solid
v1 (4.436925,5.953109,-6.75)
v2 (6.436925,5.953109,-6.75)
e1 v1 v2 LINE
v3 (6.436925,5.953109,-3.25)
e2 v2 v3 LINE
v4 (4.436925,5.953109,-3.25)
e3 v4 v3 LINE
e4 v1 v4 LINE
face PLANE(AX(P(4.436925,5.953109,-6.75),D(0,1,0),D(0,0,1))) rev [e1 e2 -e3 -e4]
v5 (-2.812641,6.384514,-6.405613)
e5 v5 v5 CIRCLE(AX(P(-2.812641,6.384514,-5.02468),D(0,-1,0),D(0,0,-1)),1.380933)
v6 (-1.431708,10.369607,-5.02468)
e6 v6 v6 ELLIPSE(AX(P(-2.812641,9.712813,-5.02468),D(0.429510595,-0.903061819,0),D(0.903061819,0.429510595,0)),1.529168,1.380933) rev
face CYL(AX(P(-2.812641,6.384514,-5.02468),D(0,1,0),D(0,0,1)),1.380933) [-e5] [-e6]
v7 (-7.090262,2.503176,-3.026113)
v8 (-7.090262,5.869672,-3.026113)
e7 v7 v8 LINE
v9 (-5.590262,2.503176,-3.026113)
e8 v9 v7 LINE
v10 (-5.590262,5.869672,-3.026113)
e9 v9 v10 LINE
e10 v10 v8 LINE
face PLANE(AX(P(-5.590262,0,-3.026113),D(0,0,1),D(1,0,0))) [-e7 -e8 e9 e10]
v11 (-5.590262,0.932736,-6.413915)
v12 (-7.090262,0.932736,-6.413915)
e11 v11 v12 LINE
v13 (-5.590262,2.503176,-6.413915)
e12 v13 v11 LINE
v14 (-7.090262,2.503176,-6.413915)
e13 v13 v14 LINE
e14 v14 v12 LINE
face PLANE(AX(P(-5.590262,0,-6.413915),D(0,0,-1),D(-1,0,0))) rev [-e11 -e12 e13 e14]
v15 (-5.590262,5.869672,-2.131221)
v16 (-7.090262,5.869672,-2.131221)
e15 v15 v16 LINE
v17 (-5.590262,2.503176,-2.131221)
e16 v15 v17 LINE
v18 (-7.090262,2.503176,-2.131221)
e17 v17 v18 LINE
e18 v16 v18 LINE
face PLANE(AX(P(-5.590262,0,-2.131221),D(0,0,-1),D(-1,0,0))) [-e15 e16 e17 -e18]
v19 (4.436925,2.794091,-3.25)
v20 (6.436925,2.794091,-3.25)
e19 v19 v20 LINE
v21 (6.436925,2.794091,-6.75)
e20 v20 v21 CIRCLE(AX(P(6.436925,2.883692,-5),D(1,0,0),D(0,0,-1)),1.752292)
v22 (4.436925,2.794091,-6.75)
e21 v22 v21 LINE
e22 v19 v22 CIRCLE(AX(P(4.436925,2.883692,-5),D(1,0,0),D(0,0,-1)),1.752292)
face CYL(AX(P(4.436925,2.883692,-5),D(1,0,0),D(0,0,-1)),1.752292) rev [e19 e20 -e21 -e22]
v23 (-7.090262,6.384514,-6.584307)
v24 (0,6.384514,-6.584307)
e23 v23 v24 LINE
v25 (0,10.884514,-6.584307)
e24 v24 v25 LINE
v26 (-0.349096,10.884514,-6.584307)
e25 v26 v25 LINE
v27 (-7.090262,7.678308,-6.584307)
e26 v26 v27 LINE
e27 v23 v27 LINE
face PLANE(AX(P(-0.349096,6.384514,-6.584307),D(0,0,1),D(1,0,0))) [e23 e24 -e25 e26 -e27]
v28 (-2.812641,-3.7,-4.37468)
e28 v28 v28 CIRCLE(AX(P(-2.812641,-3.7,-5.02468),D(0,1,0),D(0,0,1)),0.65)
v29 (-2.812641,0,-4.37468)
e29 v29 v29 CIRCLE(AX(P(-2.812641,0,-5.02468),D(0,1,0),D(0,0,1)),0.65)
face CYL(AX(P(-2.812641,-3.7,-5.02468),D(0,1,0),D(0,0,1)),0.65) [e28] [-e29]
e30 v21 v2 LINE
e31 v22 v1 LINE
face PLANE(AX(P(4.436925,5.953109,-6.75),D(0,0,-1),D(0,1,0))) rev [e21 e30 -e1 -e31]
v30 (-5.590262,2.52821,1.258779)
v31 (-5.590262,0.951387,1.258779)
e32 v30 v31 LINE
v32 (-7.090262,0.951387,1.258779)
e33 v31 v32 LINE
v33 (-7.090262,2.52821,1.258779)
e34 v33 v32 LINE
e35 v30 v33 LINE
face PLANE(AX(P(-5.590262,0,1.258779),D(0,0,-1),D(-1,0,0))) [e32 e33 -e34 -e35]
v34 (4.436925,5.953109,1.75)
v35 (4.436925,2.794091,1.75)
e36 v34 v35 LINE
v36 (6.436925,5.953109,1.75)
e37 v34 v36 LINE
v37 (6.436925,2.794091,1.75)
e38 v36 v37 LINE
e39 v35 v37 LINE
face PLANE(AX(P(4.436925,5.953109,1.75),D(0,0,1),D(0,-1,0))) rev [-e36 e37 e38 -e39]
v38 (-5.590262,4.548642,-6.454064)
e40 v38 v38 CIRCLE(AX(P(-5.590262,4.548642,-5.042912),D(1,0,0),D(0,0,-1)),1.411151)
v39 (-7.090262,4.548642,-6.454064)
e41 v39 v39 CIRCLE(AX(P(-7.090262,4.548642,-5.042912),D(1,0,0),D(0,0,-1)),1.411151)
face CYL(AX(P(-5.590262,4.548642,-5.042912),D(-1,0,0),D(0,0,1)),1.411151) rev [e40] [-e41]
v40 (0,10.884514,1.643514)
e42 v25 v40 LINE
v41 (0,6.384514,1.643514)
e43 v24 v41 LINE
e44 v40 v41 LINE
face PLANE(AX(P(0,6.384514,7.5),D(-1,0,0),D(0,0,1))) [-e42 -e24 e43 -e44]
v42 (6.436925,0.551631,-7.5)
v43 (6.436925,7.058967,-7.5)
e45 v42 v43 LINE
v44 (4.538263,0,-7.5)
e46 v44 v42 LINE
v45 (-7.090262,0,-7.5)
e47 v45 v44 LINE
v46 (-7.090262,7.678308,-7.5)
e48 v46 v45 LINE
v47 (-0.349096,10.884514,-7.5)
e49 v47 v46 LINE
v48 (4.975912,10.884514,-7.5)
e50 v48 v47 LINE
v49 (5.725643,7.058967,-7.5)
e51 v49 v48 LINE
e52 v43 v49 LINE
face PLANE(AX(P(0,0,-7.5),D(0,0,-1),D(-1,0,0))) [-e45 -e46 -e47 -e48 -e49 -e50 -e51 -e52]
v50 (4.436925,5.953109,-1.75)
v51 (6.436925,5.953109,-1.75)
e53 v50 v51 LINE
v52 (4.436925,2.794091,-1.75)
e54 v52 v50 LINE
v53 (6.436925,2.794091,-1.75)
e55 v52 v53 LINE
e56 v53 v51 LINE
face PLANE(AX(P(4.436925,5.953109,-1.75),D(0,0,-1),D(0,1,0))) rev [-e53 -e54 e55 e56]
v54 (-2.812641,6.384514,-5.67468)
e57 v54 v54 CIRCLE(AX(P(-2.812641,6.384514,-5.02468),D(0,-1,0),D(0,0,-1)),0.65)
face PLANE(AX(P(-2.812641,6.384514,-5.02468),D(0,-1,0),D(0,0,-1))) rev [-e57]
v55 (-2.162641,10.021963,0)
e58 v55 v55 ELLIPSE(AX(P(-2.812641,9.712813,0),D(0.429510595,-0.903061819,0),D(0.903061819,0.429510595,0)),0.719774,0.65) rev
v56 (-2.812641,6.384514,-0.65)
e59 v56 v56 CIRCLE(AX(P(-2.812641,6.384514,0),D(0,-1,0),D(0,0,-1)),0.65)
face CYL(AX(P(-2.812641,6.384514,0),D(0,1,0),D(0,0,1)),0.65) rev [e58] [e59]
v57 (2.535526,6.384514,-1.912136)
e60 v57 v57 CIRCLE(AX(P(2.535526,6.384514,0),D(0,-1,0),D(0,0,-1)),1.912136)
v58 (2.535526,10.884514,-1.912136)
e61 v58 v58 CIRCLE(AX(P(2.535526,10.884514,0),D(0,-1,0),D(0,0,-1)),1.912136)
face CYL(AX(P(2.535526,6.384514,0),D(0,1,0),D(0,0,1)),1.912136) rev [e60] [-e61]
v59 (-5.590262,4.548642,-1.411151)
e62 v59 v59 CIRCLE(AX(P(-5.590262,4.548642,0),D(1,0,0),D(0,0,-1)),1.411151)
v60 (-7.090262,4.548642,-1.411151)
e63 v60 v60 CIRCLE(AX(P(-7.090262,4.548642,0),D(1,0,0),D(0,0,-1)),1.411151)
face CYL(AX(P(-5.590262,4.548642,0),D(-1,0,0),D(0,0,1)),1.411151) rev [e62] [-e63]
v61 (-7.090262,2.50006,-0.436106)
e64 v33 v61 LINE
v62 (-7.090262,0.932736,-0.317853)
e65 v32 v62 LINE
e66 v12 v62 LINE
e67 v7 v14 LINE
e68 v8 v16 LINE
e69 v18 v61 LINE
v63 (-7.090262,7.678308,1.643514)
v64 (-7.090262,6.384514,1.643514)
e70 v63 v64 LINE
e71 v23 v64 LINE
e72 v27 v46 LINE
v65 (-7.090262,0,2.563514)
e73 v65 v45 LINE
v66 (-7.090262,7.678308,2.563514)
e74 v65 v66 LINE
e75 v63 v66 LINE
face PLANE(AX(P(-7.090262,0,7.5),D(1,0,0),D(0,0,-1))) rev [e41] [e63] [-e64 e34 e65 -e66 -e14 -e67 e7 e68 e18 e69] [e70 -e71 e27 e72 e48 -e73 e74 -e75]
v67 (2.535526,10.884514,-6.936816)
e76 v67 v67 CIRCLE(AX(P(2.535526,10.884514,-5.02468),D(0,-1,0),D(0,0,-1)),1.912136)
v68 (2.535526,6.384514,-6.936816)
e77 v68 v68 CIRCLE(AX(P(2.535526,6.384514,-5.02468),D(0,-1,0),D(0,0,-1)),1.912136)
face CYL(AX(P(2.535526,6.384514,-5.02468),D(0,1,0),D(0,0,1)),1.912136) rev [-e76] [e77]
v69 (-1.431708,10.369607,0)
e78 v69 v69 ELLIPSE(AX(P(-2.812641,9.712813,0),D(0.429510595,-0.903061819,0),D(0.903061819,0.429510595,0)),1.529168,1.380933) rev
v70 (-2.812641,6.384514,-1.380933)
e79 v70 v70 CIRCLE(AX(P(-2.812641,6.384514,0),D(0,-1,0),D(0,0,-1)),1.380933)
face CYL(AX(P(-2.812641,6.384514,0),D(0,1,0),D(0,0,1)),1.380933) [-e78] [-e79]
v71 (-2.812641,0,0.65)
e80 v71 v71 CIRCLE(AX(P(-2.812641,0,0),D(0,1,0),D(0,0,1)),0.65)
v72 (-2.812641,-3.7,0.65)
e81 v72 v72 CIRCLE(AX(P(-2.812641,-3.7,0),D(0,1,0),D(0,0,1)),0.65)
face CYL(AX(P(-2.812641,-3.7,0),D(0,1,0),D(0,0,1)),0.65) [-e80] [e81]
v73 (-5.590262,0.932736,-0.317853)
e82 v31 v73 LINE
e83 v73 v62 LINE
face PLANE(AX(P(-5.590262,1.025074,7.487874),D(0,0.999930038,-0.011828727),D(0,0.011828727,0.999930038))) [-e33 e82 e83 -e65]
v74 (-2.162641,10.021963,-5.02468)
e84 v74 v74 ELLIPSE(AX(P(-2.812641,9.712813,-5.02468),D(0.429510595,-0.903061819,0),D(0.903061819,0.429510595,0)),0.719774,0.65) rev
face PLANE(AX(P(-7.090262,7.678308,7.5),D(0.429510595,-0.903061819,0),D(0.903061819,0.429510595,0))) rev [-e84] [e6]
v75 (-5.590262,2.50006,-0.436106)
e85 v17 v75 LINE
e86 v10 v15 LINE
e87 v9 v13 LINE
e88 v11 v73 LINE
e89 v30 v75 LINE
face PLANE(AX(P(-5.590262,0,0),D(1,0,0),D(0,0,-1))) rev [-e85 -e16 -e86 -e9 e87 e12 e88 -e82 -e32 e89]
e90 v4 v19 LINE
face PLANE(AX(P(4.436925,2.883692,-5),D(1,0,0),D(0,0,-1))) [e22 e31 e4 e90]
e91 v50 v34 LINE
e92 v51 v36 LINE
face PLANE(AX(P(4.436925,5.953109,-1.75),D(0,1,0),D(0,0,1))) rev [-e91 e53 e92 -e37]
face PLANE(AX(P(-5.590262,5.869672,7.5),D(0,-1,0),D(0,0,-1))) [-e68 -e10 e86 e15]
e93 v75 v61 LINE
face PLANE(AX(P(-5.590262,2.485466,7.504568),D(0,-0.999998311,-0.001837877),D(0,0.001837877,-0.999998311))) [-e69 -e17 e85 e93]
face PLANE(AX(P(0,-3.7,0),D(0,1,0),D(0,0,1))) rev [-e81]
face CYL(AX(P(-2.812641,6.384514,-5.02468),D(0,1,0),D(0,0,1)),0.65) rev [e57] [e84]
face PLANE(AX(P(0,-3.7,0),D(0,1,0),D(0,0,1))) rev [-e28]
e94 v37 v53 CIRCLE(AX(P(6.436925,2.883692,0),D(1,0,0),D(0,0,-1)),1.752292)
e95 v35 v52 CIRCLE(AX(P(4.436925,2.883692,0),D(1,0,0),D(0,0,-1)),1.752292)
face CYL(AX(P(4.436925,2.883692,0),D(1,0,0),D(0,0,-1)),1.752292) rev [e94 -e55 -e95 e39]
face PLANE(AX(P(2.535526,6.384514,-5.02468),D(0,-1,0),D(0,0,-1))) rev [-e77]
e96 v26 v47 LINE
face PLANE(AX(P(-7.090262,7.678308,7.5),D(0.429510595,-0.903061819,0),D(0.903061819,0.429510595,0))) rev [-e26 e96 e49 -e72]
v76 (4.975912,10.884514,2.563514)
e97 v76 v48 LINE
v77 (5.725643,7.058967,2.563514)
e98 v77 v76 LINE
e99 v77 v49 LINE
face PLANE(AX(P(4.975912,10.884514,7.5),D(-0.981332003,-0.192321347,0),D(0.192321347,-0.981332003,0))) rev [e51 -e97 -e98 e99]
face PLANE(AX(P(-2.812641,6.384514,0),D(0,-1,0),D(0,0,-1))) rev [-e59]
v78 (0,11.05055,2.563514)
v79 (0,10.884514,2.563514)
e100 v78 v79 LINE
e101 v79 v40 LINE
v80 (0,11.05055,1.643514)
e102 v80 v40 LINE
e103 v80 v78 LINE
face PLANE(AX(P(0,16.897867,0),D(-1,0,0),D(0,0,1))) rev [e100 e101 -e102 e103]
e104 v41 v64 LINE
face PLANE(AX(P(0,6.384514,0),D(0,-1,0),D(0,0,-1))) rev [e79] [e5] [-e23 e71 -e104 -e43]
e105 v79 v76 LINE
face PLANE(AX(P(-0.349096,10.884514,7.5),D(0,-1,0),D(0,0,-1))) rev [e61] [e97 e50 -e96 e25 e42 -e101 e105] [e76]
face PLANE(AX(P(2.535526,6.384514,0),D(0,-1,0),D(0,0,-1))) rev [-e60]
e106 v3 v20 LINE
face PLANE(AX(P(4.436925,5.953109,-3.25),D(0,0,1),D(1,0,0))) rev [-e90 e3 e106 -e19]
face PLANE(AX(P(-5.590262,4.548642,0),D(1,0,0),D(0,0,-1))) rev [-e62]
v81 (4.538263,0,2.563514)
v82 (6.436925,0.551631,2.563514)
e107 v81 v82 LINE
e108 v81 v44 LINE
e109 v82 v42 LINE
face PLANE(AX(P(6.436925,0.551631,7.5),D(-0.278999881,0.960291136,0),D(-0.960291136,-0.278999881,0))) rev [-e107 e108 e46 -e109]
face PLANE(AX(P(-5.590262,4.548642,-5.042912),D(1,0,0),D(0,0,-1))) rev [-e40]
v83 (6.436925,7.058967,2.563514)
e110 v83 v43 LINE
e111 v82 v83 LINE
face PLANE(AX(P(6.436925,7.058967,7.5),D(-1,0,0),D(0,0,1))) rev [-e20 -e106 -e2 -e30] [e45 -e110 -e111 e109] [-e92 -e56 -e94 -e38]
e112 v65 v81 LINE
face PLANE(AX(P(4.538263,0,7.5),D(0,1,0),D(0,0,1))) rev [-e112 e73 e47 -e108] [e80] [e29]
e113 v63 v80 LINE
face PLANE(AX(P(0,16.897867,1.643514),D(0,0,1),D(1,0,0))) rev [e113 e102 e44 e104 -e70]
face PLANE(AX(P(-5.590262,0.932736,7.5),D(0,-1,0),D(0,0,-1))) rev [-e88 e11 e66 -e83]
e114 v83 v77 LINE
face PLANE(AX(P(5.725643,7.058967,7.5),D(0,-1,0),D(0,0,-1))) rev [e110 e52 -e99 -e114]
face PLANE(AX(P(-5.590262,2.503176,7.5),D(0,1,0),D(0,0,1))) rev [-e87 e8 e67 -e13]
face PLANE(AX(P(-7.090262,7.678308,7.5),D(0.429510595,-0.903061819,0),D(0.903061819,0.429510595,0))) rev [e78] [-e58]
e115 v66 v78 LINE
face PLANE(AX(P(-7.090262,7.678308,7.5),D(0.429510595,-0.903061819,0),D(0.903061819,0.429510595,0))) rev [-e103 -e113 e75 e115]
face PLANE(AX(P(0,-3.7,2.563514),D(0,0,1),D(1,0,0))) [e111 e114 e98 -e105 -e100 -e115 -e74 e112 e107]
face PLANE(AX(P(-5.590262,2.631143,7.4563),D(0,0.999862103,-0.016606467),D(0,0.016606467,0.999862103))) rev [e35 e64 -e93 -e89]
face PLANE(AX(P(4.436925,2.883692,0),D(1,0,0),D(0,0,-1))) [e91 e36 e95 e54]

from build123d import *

# Parameters (mm, degrees)
EXTRUDE_1_DEPTH     = 7.5
CUT_EXTRUDE_START   = 10.884514
SKETCH_2_R          = 1.912136214
SKETCH_2_W          = 7.090261775
SKETCH_2_H          = 13.093091483
SKETCH_2_R_2        = 1.380933403
SKETCH_2_R_3        = 0.65
CUT_EXTRUDE_1_DEPTH = 4.5
CUT_EXTRUDE_2_DEPTH = 2
SKETCH_2_6_R        = 0.65
EXTRUDE_3_DEPTH     = 3.7
CUT_EXTRUDE_START_2 = -7.090262
SKETCH_4_R          = 1.411151221
SKETCH_4_R_2        = 0.775543873
CUT_EXTRUDE_3_DEPTH = 1.5
SKETCH_5_W          = 1.46101298
SKETCH_5_H          = 4.936486251
SKETCH_5_R          = 1.912136214
CUT_EXTRUDE_4_DEPTH = 18.867005063
EXTRUDE_START       = 1.643513749
EXTRUDE_4_DEPTH     = 0.92


# Read off the part's stored shape, not the designer's step: Бобышка-Вытянуть4
with BuildPart() as part:
    # Эскиз1 → Бобышка-Вытянуть1 (new, symmetric)
    with BuildSketch(Plane.XY):
        Polygon((-7.090261775, 0), (-7.090261775, 7.678308116), (-0.349095572, 10.884514209), (4.975912264, 10.884514209), (5.725642609, 7.058967063), (6.436925244, 7.058967063), (6.436925244, 0.551631224), (4.538262875, 0), align=None)
    extrude(amount=EXTRUDE_1_DEPTH, both=True)

    # Эскиз2 → Вырез-Вытянуть1 (cut)
    # profile 1 of 7: a face of its own
    with BuildSketch(Plane(origin=(0, 0, 0), x_dir=(1, 0, 0), z_dir=(0, 1, 0)).offset(CUT_EXTRUDE_START)):
        with Locations(Location((2.535525991, 5.024679523, 0), (0, 0, 90))):
            Circle(SKETCH_2_R)
    # profile 2 of 7: a face of its own
    with BuildSketch(Plane(origin=(0, 0, 0), x_dir=(1, 0, 0), z_dir=(0, 1, 0)).offset(CUT_EXTRUDE_START)):
        with Locations(Location((2.535525991, 0, 0), (0, 0, 90))):
            Circle(SKETCH_2_R)
    # profile 3 of 7: a face of its own
    with BuildSketch(Plane(origin=(0, 0, 0), x_dir=(1, 0, 0), z_dir=(0, 1, 0)).offset(CUT_EXTRUDE_START)):
        with Locations(Location((2.535525991, -5.063513749, 0), (0, 0, 90))):
            Circle(SKETCH_2_R)
    # profile 4 of 7: a face of its own
    with BuildSketch(Plane(origin=(0, 0, 0), x_dir=(1, 0, 0), z_dir=(0, 1, 0)).offset(CUT_EXTRUDE_START)):
        with Locations((-3.545130888, 0.03776166)):
            Rectangle(SKETCH_2_W, SKETCH_2_H)
        with Locations((-2.812641214, -5.063513749)):
            Circle(SKETCH_2_R_2, mode=Mode.SUBTRACT)
        with Locations((-2.812641214, 0)):
            Circle(SKETCH_2_R_2, mode=Mode.SUBTRACT)
        with Locations((-2.812641214, 5.024679523)):
            Circle(SKETCH_2_R_2, mode=Mode.SUBTRACT)
    # profile 5 of 7: a face of its own
    with BuildSketch(Plane(origin=(0, 0, 0), x_dir=(1, 0, 0), z_dir=(0, 1, 0)).offset(CUT_EXTRUDE_START)):
        with Locations((-2.812641214, -5.063513749)):
            Circle(SKETCH_2_R_3)
    # profile 6 of 7: a face of its own
    with BuildSketch(Plane(origin=(0, 0, 0), x_dir=(1, 0, 0), z_dir=(0, 1, 0)).offset(CUT_EXTRUDE_START)):
        with Locations((-2.812641214, 0)):
            Circle(SKETCH_2_R_3)
    # profile 7 of 7: a face of its own
    with BuildSketch(Plane(origin=(0, 0, 0), x_dir=(1, 0, 0), z_dir=(0, 1, 0)).offset(CUT_EXTRUDE_START)):
        with Locations((-2.812641214, 5.024679523)):
            Circle(SKETCH_2_R_3)
    extrude(amount=-CUT_EXTRUDE_1_DEPTH, mode=Mode.SUBTRACT)

    # Эскиз3 → Вырез-Вытянуть2 (cut)
    with BuildSketch(Plane(origin=(6.436925244, 0, 0), x_dir=(0, 0, -1), z_dir=(1, 0, 0))):
        with BuildLine():
            Line((1.75, 5.953109404), (-1.75, 5.953109404))
            Line((-1.75, 5.953109404), (-1.75, 2.794090542))
            ThreePointArc((-1.75, 2.794090542), (0, 1.131399682), (1.75, 2.794090542))
            Line((1.75, 2.794090542), (1.75, 5.953109404))
        make_face()
        with BuildLine():
            Line((3.25, 5.953109404), (3.25, 2.794090542))
            ThreePointArc((3.25, 2.794090542), (5, 1.131399682), (6.75, 2.794090542))
            Line((6.75, 2.794090542), (6.75, 5.953109404))
            Line((6.75, 5.953109404), (3.25, 5.953109404))
        make_face()
        with BuildLine():
            Line((-6.75, 5.953109404), (-6.75, 2.794090542))
            ThreePointArc((-6.75, 2.794090542), (-5, 1.131399682), (-3.25, 2.794090542))
            Line((-3.25, 2.794090542), (-3.25, 5.953109404))
            Line((-3.25, 5.953109404), (-6.75, 5.953109404))
        make_face()
    extrude(amount=-CUT_EXTRUDE_2_DEPTH, mode=Mode.SUBTRACT)

    # Эскиз2<6> → Бобышка-Вытянуть3 (add)
    with BuildSketch(Plane(origin=(0, 0, 0), x_dir=(1, 0, 0), z_dir=(0, 1, 0))):
        with Locations((-2.812641214, 5.024679523)):
            Circle(SKETCH_2_6_R)
        with Locations((-2.812641214, 0)):
            Circle(SKETCH_2_6_R)
        with Locations((-2.812641214, -5.063513749)):
            Circle(SKETCH_2_6_R)
    extrude(amount=-EXTRUDE_3_DEPTH)

    # Эскиз4 → Вырез-Вытянуть3 (cut)
    # profile 1 of 7: a face of its own
    with BuildSketch(Plane(origin=(0, 0, 0), x_dir=(0, 0, -1), z_dir=(1, 0, 0)).offset(CUT_EXTRUDE_START_2)):
        with Locations((5.042912497, 4.548641576)):
            Circle(SKETCH_4_R)
        with Locations((5.042912497, 4.548641576)):
            Circle(SKETCH_4_R_2, mode=Mode.SUBTRACT)
    # profile 2 of 7: a face of its own
    with BuildSketch(Plane(origin=(0, 0, 0), x_dir=(0, 0, -1), z_dir=(1, 0, 0)).offset(CUT_EXTRUDE_START_2)):
        with Locations((5.042912497, 4.548641576)):
            Circle(SKETCH_4_R_2)
    # profile 3 of 7: a face of its own
    with BuildSketch(Plane(origin=(0, 0, 0), x_dir=(0, 0, -1), z_dir=(1, 0, 0)).offset(CUT_EXTRUDE_START_2)):
        with Locations((0, 4.548641576)):
            Circle(SKETCH_4_R)
        with Locations((0, 4.548641576)):
            Circle(SKETCH_4_R_2, mode=Mode.SUBTRACT)
    # profile 4 of 7: a face of its own
    with BuildSketch(Plane(origin=(0, 0, 0), x_dir=(0, 0, -1), z_dir=(1, 0, 0)).offset(CUT_EXTRUDE_START_2)):
        with Locations((0, 4.548641576)):
            Circle(SKETCH_4_R_2)
    # profile 5 of 7: a face of its own
    with BuildSketch(Plane(origin=(0, 0, 0), x_dir=(0, 0, -1), z_dir=(1, 0, 0)).offset(CUT_EXTRUDE_START_2)):
        with Locations((-5.053327676, 4.548641576)):
            Circle(SKETCH_4_R)
        with Locations((-5.053327676, 4.548641576)):
            Circle(SKETCH_4_R_2, mode=Mode.SUBTRACT)
    # profile 6 of 7: a face of its own
    with BuildSketch(Plane(origin=(0, 0, 0), x_dir=(0, 0, -1), z_dir=(1, 0, 0)).offset(CUT_EXTRUDE_START_2)):
        with Locations((-5.053327676, 4.548641576)):
            Circle(SKETCH_4_R_2)
    # profile 7 of 7: a face of its own
    with BuildSketch(Plane(origin=(0, 0, 0), x_dir=(0, 0, -1), z_dir=(1, 0, 0)).offset(CUT_EXTRUDE_START_2)):
        Polygon((6.413915436, 2.503175658), (3.026112508, 2.503175658), (3.026112508, 5.869671649), (2.131221168, 5.869671649), (2.131221168, 2.503175658), (0.436105724, 2.500060238), (-1.258778832, 2.528210165), (-1.258778832, 0.951386535), (0.31785264, 0.932735686), (6.413915436, 0.932735686), align=None)
    extrude(amount=CUT_EXTRUDE_3_DEPTH, mode=Mode.SUBTRACT)

    # Эскиз5 → Вырез-Вытянуть4 (cut, through all)
    # profile 1 of 4: a face of its own
    with BuildSketch(Plane(origin=(0, 10.884514209, 0), x_dir=(1, 0, 0), z_dir=(0, 1, 0))):
        Polygon((0, -2.563513749), (-7.090261775, -2.563513749), (-7.090261775, -7.5), (-0.349095572, -7.5), (-0.349095572, -6.508784082), (0, -6.508784082), align=None)
    # profile 2 of 4: a face of its own
    with BuildSketch(Plane(origin=(0, 10.884514209, 0), x_dir=(1, 0, 0), z_dir=(0, 1, 0))):
        with Locations((5.706418754, -5.031756875)):
            Rectangle(SKETCH_5_W, SKETCH_5_H)
    # profile 3 of 4: a face of its own
    with BuildSketch(Plane(origin=(0, 10.884514209, 0), x_dir=(1, 0, 0), z_dir=(0, 1, 0))):
        Polygon((4.975912264, -2.563513749), (0, -2.563513749), (0, -6.508784082), (-0.349095572, -6.508784082), (-0.349095572, -7.5), (4.975912264, -7.5), align=None)
        with Locations((2.535525991, -5.063513749)):
            Circle(SKETCH_5_R, mode=Mode.SUBTRACT)
    # profile 4 of 4: a face of its own
    with BuildSketch(Plane(origin=(0, 10.884514209, 0), x_dir=(1, 0, 0), z_dir=(0, 1, 0))):
        with Locations((2.535525991, -5.063513749)):
            Circle(SKETCH_5_R)
    extrude(amount=-CUT_EXTRUDE_4_DEPTH, mode=Mode.SUBTRACT)

    # Бобышка-Вытянуть4 outline → Бобышка-Вытянуть4 (add)
    with BuildSketch(Plane.XY.offset(EXTRUDE_START)):
        Polygon((-7.090261775, 7.678308116), (-7.090261775, 6.384514209), (0, 6.384514209), (0, 11.050549627), align=None)
    extrude(amount=EXTRUDE_4_DEPTH)


solid = part.part
